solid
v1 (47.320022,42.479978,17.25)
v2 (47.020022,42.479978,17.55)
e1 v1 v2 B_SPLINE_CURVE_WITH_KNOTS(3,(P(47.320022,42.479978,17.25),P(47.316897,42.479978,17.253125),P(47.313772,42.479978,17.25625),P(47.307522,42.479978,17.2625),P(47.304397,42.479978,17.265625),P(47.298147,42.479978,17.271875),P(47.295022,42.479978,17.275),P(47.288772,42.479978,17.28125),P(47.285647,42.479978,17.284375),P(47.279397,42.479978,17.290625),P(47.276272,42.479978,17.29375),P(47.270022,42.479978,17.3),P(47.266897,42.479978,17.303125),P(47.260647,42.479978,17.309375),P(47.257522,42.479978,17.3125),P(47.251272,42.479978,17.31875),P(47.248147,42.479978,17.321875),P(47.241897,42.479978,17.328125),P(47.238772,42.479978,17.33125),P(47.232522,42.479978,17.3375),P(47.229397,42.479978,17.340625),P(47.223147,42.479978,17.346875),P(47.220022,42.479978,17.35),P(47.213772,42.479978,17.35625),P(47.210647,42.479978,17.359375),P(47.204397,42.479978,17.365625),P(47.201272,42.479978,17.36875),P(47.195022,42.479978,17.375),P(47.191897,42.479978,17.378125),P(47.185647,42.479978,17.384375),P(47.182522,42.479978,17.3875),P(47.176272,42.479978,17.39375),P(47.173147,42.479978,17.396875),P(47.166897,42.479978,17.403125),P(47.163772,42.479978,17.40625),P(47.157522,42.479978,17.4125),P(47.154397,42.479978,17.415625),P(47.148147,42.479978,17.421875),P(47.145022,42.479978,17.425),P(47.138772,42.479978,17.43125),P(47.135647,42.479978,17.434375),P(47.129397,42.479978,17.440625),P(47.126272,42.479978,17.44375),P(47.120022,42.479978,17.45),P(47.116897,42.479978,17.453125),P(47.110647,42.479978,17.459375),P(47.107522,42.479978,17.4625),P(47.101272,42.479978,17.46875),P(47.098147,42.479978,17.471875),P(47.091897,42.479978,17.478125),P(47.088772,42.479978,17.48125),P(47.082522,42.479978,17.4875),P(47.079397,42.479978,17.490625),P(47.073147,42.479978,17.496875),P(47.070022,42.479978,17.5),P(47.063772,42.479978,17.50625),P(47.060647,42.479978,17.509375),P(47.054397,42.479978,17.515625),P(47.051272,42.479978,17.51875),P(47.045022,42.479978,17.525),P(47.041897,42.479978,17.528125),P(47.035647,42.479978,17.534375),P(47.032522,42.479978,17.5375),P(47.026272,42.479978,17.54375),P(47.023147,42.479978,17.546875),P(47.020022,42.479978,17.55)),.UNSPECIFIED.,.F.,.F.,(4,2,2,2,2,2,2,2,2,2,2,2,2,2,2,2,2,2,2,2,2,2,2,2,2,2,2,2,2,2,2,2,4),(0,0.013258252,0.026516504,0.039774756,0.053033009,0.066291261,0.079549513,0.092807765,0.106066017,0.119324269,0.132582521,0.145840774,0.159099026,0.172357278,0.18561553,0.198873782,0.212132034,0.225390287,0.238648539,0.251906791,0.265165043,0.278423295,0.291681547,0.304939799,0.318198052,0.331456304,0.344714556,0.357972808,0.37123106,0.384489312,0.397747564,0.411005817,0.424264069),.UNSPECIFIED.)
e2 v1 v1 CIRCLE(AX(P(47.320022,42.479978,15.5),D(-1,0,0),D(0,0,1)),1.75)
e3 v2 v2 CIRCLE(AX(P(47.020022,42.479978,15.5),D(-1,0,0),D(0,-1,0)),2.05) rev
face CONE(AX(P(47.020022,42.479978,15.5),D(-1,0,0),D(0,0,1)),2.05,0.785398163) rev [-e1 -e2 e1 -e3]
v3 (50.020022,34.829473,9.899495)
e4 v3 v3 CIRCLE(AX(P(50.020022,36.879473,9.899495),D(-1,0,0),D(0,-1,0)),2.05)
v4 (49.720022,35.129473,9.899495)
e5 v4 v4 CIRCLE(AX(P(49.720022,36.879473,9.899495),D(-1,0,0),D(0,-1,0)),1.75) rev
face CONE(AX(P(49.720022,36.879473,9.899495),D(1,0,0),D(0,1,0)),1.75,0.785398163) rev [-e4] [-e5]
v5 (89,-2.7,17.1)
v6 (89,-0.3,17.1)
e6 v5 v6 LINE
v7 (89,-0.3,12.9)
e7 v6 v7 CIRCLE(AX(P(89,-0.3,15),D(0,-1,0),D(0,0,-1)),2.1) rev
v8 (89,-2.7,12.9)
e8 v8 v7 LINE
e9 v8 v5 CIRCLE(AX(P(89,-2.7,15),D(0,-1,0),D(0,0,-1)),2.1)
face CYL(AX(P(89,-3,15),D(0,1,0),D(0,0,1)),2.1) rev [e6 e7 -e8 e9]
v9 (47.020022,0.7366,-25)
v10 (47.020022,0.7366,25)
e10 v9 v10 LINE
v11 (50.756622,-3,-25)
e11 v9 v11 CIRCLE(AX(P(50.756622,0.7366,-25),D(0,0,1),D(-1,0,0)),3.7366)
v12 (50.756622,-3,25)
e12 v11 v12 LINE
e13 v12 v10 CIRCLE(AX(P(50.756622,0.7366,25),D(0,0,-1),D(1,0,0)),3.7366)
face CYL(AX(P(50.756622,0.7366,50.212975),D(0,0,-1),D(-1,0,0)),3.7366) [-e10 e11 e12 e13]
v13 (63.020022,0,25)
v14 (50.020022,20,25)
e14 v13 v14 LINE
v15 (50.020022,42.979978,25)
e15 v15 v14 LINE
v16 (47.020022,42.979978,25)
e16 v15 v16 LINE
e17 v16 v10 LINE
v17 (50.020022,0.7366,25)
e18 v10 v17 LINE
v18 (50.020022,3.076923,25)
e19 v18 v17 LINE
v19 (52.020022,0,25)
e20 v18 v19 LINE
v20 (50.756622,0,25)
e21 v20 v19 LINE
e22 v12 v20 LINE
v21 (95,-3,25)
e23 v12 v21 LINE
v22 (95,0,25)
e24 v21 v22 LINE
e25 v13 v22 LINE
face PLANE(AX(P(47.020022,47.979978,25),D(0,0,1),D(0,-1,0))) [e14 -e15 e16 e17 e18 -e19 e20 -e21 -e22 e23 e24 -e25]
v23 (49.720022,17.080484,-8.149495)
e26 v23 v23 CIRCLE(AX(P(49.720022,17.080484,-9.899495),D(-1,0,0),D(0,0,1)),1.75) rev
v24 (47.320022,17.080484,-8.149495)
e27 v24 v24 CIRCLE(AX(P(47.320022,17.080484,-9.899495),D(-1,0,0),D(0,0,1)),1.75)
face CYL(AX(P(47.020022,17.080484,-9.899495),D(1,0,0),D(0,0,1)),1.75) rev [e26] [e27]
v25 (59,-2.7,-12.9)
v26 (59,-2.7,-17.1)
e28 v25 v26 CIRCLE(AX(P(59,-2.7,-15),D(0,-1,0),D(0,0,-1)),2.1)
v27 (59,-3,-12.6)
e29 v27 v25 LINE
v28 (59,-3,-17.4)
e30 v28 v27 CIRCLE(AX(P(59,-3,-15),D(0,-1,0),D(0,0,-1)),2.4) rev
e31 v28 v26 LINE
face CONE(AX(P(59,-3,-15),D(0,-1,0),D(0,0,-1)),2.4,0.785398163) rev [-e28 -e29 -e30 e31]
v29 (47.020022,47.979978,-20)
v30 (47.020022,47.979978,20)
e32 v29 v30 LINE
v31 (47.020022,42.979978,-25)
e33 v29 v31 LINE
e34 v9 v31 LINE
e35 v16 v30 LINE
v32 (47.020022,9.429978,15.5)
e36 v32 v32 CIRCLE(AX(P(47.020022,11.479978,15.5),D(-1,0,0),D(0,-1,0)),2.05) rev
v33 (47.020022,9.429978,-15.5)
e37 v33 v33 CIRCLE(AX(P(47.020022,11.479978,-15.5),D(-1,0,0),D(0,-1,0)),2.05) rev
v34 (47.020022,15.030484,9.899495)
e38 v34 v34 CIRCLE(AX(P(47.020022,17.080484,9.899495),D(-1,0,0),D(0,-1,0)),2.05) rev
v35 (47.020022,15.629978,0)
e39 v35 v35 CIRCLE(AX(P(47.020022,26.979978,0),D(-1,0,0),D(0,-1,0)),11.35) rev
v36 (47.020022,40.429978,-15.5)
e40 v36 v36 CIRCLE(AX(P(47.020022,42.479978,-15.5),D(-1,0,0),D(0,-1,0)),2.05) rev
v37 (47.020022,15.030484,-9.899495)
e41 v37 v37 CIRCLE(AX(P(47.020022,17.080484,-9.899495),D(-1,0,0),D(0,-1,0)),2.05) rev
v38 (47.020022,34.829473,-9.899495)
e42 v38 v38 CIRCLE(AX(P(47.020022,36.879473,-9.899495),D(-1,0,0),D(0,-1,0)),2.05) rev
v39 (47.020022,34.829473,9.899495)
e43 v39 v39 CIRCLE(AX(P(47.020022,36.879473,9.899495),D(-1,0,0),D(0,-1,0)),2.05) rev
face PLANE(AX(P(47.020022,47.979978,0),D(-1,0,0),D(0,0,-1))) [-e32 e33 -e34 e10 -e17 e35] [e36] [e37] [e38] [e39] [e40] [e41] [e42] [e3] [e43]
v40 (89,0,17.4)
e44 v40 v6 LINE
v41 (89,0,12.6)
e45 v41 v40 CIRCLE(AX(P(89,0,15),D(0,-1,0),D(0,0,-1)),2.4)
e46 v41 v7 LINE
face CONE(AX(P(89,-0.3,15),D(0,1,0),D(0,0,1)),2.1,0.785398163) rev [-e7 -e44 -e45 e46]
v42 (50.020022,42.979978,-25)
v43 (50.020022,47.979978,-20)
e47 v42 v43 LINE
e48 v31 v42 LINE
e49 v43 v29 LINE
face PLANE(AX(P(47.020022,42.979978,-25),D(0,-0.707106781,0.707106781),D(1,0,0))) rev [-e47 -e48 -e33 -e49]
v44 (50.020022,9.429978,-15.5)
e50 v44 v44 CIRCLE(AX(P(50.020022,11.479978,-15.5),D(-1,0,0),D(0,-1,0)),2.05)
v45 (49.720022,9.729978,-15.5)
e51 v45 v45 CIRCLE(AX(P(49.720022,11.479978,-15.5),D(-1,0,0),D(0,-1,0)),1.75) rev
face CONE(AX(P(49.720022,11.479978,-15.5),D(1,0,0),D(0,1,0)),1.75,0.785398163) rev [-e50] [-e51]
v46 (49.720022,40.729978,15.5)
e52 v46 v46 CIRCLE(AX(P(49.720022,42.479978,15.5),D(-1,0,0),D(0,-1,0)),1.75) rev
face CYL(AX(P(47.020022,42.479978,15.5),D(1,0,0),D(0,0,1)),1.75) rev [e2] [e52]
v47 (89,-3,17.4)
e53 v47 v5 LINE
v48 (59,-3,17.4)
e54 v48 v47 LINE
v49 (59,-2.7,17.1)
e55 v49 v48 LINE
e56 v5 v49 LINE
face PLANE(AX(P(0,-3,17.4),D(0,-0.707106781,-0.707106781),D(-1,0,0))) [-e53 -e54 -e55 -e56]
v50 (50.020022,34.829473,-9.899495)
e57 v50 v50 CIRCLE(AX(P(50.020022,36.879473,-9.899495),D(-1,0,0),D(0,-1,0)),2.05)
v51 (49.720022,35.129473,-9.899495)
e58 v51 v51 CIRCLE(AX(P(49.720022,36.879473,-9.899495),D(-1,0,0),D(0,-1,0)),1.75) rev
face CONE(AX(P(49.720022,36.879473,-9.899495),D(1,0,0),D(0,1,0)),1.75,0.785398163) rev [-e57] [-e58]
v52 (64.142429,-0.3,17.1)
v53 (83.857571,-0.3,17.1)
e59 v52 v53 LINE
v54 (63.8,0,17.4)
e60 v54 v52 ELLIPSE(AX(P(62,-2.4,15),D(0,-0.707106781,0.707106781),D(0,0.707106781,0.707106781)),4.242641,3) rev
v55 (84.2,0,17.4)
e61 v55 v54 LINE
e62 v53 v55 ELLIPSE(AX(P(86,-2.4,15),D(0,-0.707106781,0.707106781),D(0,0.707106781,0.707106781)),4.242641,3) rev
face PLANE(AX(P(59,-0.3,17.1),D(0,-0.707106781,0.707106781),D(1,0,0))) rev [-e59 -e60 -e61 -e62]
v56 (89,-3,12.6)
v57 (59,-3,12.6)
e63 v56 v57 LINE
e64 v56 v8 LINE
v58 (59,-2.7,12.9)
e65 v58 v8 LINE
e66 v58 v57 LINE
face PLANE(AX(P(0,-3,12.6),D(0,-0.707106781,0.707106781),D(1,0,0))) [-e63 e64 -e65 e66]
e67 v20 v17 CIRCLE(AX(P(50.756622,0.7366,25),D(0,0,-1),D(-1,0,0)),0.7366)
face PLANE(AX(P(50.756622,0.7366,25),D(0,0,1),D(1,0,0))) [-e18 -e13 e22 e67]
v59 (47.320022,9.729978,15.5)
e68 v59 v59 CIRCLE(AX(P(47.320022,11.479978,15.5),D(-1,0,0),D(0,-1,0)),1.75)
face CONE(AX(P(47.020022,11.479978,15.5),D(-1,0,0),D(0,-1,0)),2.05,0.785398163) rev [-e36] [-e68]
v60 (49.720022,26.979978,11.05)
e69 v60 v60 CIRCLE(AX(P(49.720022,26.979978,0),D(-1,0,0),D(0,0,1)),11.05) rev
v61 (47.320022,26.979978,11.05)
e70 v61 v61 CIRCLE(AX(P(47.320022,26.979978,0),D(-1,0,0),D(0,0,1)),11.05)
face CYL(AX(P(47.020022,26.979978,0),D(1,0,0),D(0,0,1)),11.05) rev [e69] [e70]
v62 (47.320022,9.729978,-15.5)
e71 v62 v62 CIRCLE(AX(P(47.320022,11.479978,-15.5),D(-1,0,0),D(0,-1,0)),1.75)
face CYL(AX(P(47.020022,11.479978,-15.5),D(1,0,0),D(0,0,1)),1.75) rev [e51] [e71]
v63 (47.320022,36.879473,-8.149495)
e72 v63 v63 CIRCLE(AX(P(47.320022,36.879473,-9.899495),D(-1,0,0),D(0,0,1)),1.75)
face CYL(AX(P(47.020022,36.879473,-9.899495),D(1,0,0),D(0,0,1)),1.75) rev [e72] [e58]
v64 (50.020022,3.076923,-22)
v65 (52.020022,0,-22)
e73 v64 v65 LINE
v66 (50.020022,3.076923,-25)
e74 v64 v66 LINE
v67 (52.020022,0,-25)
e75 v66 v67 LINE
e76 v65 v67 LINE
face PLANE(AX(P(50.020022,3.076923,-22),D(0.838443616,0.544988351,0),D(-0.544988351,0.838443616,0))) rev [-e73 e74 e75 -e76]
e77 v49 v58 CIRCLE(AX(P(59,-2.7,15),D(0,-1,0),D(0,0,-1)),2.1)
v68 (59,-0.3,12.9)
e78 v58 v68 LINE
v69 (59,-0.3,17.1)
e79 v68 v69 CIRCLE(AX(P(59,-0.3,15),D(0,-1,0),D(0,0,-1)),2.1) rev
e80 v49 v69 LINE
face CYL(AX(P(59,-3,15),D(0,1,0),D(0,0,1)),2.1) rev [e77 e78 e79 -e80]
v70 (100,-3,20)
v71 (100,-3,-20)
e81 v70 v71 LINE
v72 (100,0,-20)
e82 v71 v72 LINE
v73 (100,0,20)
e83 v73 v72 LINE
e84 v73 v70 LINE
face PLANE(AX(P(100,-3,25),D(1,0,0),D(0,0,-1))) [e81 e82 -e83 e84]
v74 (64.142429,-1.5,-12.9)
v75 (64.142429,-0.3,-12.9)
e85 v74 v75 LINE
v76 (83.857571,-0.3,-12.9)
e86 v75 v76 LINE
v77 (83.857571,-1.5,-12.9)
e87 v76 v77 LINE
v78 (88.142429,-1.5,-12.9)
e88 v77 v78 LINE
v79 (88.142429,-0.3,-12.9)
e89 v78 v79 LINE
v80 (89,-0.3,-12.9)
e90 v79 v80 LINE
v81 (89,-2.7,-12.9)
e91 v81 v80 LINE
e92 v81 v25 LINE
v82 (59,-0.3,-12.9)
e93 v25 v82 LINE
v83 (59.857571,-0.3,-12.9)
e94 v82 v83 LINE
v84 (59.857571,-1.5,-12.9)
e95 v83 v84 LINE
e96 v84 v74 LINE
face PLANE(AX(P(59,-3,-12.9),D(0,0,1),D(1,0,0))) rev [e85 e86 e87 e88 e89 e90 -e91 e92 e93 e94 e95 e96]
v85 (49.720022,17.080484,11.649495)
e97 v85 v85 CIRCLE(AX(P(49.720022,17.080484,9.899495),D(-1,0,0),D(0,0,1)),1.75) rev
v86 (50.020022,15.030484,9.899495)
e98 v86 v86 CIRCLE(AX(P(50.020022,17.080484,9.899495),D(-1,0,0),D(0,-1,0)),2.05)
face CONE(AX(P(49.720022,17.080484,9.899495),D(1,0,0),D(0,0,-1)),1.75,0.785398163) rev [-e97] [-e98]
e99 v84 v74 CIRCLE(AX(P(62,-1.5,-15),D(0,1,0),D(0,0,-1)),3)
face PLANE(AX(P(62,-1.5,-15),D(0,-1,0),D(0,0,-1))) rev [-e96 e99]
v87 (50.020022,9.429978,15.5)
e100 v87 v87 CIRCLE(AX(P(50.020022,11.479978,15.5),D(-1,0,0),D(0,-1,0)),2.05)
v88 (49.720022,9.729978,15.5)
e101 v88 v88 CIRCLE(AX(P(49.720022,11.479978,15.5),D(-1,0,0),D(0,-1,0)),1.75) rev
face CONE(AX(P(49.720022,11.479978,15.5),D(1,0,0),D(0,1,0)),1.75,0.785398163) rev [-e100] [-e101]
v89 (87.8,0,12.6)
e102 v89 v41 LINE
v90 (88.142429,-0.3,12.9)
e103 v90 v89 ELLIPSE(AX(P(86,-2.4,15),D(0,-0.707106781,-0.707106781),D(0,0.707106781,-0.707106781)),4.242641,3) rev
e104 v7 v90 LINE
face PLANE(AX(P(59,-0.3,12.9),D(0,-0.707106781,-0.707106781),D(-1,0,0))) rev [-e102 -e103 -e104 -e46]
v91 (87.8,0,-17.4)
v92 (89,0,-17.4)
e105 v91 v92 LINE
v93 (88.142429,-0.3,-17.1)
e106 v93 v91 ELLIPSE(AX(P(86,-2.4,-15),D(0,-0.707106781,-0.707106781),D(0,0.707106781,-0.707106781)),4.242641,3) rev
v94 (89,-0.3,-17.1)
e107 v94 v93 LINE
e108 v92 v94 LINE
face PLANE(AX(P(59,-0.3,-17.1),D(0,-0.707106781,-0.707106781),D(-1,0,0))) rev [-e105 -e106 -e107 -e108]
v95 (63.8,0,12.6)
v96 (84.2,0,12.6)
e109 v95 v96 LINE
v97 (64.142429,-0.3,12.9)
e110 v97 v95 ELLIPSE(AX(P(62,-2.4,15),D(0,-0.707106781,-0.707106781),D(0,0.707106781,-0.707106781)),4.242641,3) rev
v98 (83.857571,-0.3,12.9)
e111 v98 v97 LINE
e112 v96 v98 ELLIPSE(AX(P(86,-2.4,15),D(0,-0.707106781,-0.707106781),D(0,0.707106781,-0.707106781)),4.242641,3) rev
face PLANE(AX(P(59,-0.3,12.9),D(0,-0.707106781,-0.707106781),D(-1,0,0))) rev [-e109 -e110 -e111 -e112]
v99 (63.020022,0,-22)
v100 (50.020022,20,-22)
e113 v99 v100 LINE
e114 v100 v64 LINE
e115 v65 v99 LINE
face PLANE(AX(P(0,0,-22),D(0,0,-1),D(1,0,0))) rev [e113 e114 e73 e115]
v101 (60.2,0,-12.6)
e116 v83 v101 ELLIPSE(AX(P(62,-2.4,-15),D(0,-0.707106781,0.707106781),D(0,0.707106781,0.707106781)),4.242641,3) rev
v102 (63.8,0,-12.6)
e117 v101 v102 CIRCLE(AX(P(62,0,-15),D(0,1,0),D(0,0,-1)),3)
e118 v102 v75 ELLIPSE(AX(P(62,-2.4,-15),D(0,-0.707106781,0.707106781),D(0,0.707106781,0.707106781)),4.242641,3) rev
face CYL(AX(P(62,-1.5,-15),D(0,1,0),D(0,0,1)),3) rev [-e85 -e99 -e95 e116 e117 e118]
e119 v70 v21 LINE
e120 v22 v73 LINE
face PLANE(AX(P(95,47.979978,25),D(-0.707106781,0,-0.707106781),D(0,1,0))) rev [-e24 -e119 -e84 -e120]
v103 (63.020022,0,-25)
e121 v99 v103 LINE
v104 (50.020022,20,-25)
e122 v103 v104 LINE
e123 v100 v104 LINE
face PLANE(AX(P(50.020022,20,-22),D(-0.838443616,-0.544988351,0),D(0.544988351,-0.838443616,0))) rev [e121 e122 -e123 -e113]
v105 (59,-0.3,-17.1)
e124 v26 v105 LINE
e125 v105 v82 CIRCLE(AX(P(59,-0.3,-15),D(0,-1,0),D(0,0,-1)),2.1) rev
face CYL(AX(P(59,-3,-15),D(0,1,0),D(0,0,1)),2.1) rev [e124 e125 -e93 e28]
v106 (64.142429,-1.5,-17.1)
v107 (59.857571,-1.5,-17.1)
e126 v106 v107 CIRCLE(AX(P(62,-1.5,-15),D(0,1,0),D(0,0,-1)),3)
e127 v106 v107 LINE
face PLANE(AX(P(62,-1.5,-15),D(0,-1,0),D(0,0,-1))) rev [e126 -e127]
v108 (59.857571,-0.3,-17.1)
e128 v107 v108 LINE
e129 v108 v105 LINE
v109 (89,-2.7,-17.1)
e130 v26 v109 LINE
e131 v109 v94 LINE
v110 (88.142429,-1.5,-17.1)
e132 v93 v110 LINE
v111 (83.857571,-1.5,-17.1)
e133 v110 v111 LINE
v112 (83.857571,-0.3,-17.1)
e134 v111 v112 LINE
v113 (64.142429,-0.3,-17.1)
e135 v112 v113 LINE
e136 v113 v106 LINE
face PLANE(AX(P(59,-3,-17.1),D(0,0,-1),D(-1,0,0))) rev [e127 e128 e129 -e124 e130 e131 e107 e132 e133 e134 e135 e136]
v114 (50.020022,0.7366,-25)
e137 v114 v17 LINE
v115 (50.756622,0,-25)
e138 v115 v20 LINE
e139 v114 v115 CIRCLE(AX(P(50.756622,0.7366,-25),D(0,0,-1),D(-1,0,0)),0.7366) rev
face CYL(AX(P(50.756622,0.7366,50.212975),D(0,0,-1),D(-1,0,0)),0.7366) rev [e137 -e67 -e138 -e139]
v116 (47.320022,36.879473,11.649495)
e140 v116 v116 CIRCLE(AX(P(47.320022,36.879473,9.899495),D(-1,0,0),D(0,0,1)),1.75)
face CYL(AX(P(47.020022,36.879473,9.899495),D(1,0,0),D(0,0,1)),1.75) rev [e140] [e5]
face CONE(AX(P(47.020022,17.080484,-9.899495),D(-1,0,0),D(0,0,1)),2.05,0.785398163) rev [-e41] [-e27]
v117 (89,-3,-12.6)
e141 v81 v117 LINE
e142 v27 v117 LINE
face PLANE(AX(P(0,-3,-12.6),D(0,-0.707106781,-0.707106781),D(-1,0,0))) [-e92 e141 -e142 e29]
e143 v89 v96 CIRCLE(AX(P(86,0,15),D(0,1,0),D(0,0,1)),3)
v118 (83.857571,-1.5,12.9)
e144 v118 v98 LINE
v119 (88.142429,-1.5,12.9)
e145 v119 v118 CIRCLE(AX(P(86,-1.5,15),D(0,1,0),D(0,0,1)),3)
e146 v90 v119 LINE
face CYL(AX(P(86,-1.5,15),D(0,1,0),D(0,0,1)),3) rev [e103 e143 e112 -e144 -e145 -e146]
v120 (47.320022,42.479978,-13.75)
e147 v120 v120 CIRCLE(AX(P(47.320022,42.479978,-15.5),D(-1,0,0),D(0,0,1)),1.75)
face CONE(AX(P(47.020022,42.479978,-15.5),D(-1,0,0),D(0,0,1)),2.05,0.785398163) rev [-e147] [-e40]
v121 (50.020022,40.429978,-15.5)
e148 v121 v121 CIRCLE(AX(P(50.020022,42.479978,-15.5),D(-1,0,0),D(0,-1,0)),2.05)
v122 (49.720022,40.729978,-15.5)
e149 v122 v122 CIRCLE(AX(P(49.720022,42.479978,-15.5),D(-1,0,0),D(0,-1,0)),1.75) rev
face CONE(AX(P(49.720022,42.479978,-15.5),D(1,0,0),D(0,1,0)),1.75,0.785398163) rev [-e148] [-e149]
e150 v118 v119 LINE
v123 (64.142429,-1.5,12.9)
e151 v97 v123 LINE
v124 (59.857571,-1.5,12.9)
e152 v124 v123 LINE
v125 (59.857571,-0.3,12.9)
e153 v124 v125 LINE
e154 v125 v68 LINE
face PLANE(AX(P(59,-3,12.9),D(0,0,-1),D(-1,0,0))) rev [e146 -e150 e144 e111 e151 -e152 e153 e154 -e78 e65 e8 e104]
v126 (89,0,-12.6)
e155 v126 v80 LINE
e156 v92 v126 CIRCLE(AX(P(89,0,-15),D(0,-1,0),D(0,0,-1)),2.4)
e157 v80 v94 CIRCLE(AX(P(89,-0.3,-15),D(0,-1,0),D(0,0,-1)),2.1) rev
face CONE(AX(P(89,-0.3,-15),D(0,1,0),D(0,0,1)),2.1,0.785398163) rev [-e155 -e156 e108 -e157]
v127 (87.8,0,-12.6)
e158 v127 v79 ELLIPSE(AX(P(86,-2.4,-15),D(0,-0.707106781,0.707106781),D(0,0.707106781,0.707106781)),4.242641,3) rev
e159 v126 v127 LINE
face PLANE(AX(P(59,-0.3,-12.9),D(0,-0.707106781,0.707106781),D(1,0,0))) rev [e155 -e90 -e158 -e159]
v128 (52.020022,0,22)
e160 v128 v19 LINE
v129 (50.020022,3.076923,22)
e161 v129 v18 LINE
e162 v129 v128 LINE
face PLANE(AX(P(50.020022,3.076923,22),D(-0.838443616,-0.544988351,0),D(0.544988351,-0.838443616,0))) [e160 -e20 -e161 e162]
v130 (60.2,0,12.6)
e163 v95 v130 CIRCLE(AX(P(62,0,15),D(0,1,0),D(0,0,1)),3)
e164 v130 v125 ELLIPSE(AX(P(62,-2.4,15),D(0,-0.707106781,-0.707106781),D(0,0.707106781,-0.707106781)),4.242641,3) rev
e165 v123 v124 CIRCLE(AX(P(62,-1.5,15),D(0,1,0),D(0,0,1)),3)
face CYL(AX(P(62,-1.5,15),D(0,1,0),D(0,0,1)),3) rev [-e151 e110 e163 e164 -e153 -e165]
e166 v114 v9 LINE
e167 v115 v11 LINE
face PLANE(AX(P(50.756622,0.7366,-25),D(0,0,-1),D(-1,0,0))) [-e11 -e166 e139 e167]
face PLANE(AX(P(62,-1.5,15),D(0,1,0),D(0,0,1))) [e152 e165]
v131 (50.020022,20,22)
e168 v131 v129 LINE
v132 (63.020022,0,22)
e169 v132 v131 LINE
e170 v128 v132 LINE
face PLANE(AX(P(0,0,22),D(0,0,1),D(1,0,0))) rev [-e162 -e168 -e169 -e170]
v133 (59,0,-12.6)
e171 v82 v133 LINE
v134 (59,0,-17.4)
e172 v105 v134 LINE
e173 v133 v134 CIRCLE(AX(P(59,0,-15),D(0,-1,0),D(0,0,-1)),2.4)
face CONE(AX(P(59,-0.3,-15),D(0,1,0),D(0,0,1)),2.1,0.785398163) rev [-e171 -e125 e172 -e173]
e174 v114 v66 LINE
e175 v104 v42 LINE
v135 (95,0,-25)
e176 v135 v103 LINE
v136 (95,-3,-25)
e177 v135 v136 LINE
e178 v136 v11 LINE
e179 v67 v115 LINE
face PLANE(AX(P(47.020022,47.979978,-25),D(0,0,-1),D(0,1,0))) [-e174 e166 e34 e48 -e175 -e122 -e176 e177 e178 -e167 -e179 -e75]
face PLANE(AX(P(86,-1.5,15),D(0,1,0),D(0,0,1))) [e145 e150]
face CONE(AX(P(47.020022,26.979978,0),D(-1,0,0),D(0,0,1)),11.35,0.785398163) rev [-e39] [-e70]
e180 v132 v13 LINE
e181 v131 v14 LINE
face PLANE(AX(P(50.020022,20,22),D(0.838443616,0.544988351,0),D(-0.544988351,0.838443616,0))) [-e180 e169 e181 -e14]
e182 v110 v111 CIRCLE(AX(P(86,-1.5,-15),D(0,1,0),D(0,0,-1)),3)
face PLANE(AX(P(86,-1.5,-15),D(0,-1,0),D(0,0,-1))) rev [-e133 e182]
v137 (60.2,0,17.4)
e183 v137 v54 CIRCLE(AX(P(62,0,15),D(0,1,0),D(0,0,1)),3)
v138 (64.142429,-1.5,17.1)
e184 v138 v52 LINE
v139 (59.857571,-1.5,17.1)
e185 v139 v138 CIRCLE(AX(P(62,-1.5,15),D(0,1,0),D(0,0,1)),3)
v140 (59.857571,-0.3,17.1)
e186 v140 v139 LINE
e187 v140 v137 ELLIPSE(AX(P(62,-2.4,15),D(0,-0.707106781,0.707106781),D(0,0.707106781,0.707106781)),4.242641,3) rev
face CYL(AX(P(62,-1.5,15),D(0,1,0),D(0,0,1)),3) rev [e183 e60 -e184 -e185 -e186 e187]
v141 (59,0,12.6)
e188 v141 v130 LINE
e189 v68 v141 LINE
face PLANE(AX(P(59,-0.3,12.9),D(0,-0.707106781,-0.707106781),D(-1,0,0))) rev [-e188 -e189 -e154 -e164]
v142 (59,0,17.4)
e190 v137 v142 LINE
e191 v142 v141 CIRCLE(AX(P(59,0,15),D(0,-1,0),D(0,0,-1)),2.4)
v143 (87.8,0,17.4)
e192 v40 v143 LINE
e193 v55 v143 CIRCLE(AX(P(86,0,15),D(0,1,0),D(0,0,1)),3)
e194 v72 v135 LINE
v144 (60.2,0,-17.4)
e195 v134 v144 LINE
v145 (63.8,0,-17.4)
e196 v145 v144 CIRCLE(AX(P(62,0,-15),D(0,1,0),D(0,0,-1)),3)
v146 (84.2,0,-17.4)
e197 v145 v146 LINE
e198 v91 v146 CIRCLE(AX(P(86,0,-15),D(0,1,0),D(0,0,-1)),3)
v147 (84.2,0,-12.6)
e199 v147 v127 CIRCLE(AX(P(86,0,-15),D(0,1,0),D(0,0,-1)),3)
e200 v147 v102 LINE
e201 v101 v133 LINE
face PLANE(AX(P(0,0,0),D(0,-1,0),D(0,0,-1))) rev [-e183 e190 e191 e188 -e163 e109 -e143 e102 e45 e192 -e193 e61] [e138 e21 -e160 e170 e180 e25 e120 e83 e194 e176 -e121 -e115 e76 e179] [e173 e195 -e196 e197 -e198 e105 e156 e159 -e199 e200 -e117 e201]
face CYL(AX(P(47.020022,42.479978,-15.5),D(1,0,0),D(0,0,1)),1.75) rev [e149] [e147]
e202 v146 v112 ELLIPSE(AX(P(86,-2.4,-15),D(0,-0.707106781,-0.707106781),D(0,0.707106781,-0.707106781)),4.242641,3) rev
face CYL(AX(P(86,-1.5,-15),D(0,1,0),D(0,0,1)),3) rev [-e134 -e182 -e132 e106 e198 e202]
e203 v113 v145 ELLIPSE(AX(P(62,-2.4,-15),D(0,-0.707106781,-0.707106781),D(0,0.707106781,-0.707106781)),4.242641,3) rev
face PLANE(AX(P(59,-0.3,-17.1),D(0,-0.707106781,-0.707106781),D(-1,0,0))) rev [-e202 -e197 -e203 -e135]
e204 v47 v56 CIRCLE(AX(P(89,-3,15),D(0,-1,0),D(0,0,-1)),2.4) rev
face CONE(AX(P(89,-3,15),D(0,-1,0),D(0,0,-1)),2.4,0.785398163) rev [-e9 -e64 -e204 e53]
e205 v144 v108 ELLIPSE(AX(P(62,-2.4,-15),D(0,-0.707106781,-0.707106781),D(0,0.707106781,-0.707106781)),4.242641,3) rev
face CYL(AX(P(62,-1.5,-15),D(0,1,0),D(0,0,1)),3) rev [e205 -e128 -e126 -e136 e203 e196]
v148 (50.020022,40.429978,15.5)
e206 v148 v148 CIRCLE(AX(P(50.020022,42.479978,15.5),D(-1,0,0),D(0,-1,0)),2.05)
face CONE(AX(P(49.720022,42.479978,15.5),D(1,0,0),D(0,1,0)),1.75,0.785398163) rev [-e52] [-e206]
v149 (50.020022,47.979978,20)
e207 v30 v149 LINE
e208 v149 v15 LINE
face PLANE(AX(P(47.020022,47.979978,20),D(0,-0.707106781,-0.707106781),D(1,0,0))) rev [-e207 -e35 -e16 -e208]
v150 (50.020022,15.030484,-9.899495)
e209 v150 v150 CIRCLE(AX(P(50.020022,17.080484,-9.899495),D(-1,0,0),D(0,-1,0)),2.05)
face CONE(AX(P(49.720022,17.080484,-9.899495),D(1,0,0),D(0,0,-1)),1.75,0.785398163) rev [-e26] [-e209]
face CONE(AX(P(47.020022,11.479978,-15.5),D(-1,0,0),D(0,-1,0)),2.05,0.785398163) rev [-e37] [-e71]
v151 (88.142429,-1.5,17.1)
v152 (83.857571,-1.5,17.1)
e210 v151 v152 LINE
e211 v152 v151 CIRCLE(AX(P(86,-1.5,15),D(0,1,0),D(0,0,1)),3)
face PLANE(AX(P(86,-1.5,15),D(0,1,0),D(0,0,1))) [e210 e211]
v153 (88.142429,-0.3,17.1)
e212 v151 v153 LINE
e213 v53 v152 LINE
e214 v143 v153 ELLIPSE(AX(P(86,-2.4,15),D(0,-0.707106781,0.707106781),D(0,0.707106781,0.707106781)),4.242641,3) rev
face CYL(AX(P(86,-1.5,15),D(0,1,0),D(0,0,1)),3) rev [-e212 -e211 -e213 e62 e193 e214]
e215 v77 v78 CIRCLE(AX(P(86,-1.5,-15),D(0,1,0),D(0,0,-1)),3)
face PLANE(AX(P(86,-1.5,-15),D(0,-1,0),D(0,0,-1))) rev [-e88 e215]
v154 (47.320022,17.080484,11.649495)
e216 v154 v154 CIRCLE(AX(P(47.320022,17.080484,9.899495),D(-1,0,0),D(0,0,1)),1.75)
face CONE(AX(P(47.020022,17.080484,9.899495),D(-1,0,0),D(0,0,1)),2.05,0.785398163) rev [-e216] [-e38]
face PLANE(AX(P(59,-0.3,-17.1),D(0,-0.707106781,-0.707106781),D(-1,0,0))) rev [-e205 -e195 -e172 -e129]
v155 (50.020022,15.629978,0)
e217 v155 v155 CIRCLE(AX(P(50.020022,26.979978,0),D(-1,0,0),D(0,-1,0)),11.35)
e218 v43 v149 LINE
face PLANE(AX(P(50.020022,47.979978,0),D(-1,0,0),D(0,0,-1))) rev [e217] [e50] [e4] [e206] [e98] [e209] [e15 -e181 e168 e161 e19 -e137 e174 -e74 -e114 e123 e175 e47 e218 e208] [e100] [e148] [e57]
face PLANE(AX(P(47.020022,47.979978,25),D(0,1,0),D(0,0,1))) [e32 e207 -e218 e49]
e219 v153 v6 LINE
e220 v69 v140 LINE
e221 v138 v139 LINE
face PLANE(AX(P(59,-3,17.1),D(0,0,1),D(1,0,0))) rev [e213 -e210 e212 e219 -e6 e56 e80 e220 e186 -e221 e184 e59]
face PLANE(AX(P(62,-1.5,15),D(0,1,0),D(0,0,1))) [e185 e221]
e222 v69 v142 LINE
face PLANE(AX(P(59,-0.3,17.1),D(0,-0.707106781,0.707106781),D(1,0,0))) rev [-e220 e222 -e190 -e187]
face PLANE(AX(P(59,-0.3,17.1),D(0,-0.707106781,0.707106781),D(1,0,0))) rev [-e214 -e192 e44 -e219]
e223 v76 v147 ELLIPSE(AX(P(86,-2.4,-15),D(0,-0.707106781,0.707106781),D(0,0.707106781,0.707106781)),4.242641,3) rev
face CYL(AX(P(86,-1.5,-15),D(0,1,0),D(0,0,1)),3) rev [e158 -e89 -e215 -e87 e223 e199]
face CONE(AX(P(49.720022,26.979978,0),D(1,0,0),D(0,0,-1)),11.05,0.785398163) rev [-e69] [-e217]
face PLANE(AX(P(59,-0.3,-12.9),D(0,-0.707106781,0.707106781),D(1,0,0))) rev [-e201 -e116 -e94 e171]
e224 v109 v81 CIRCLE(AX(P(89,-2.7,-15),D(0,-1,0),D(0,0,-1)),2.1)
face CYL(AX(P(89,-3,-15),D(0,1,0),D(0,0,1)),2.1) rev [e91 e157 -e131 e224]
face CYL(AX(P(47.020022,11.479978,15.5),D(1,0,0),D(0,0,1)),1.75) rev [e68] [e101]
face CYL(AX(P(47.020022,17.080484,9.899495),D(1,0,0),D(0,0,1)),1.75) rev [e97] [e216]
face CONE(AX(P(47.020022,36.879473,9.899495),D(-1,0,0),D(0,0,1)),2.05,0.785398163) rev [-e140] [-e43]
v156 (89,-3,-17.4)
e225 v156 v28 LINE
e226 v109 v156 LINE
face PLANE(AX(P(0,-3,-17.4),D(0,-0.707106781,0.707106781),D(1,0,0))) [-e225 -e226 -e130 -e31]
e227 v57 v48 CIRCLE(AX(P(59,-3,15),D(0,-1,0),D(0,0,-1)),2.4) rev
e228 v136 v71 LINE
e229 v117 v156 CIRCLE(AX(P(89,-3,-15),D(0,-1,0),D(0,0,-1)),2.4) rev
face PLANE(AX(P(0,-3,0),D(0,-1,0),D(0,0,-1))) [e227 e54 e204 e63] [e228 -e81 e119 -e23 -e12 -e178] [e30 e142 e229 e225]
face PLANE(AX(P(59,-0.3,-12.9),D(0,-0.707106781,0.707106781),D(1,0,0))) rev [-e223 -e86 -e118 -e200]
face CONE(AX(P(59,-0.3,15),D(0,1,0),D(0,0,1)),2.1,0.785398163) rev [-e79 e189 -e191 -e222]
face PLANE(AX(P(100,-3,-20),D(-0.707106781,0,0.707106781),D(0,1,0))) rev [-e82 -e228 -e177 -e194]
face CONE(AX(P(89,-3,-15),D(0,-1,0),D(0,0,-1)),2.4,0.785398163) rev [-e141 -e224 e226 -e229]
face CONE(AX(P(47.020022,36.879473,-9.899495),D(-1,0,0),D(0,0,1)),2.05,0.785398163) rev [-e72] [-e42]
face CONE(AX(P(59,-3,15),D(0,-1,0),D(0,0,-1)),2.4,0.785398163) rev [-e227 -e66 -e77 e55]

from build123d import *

# Parameters (mm, degrees)
SKETCH1_W                    = 100
SKETCH1_H                    = 50
BASE_FLANGE1_DEPTH           = 3
SKETCH2_R                    = 11.05
SKETCH2_R_2                  = 1.75
CUT_EXTRUDE1_DEPTH           = 104.121287812
SKETCH3_R                    = 1.75
CUT_EXTRUDE2_DEPTH           = 104.121287812
CIRPATTERN1_COUNT            = 4
CUT_EXTRUDE3_DEPTH           = 104.121287812
SKETCHED_BEND2_OUTLINE_W     = 3
SKETCHED_BEND2_OUTLINE_H     = 50
SKETCHED_BEND2_DEPTH         = 47.020021532
SKETCHED_START               = 47.383443248
SKETCHED_BEND2_2_OUTLINE_W   = 47.979978468
SKETCHED_BEND2_2_OUTLINE_H   = 50
SKETCHED_BEND2_2_OUTLINE_R   = 1.75
SKETCHED_BEND2_2_OUTLINE_R_2 = 11.05
SKETCHED_BEND2_2_DEPTH       = 2.636578284
SKETCHED_START_2             = 47.020021532
SKETCHED_BEND2_3_OUTLINE_W   = 47.979978468
SKETCHED_BEND2_3_OUTLINE_H   = 50
SKETCHED_BEND2_3_OUTLINE_R   = 1.75
SKETCHED_BEND2_3_OUTLINE_R_2 = 11.05
SKETCHED_BEND2_3_DEPTH       = 3.7366
SKETCHED_START_3             = -26
SKETCHED_BEND2_4_DEPTH       = 52
BOSS_EXTRUDE1_DEPTH          = 3
CHAMFER1_SIZE                = 5
CHAMFER2_SIZE                = 0.3
CHAMFER3_SIZE                = 0.3
SKETCH7_R                    = 3
CUT_EXTRUDE4_DEPTH           = 1.5


with BuildPart() as part:
    # Base-Flange1: sheet metal written as solids
    # Sketch1 → Base-Flange1 (new body)
    with BuildSketch(Plane(origin=(0, 0, 0), x_dir=(1, 0, 0), z_dir=(0, 1, 0))):
        with Locations((50, 0)):
            Rectangle(SKETCH1_W, SKETCH1_H)
    extrude(amount=-BASE_FLANGE1_DEPTH)

    # Sketch2 → Cut-Extrude1 (cut, through all)
    with BuildSketch(Plane(origin=(0, 0, 0), x_dir=(1, 0, 0), z_dir=(0, 1, 0))):
        with Locations(Location((21, 0, 0), (0, 0, 270))):
            Circle(SKETCH2_R)
        with Locations(Location((5.5, 15.5, 0), (0, 0, 270))):
            Circle(SKETCH2_R_2)
        with Locations(Location((36.5, 15.5, 0), (0, 0, 270))):
            Circle(SKETCH2_R_2)
        with Locations(Location((36.5, -15.5, 0), (0, 0, 270))):
            Circle(SKETCH2_R_2)
        with Locations(Location((5.5, -15.5, 0), (0, 0, 270))):
            Circle(SKETCH2_R_2)
    extrude(amount=-CUT_EXTRUDE1_DEPTH, mode=Mode.SUBTRACT)

    # Sketch3 → Cut-Extrude2 (cut, through all)
    with BuildSketch(Plane(origin=(0, 0, 0), x_dir=(1, 0, 0), z_dir=(0, 1, 0))):
        with Locations(Location((11.100505063, 9.899494937, 0), (0, 0, 270))):
            Circle(SKETCH3_R)
    cut_extrude2 = extrude(amount=-CUT_EXTRUDE2_DEPTH, mode=Mode.SUBTRACT)

    # CirPattern1: Cut-Extrude2 ×4 about axis
    cirpattern1_axis = Axis((21, 0, 0), (0, 1, 0))
    for i in range(1, CIRPATTERN1_COUNT):
        add(cut_extrude2.rotate(cirpattern1_axis, i * 360 / CIRPATTERN1_COUNT), mode=Mode.SUBTRACT)

    # Sketch4 → Cut-Extrude3 (cut, through all)
    with BuildSketch(Plane(origin=(0, 0, 0), x_dir=(1, 0, 0), z_dir=(0, 1, 0))):
        with BuildLine():
            Line((59, 17.1), (89, 17.1))
            ThreePointArc((89, 17.1), (91.1, 15), (89, 12.9))
            Line((89, 12.9), (59, 12.9))
            ThreePointArc((59, 12.9), (56.9, 15), (59, 17.1))
        make_face()
        with BuildLine():
            Line((59, -12.9), (89, -12.9))
            ThreePointArc((89, -12.9), (91.1, -15), (89, -17.1))
            Line((89, -17.1), (59, -17.1))
            ThreePointArc((59, -17.1), (56.9, -15), (59, -12.9))
        make_face()
    extrude(amount=-CUT_EXTRUDE3_DEPTH, mode=Mode.SUBTRACT)

    # Sketched Bend2: read off the stored shape, not the designer's step
    # Sketched Bend2 outline → Sketched Bend2 (cut)
    with BuildSketch(Plane.YZ):
        with Locations((-1.5, 0)):
            Rectangle(SKETCHED_BEND2_OUTLINE_W, SKETCHED_BEND2_OUTLINE_H)
    extrude(amount=SKETCHED_BEND2_DEPTH, mode=Mode.SUBTRACT)

    # Sketched Bend2 2 outline → Sketched Bend2 2 (add)
    with BuildSketch(Plane.YZ.offset(SKETCHED_START)):
        with Locations((23.989989234, 0)):
            Rectangle(SKETCHED_BEND2_2_OUTLINE_W, SKETCHED_BEND2_2_OUTLINE_H)
        with Locations((11.479978468, -15.5)):
            Circle(SKETCHED_BEND2_2_OUTLINE_R, mode=Mode.SUBTRACT)
        with Locations((17.080483531, -9.899494937)):
            Circle(SKETCHED_BEND2_2_OUTLINE_R, mode=Mode.SUBTRACT)
        with Locations((42.479978468, -15.5)):
            Circle(SKETCHED_BEND2_2_OUTLINE_R, mode=Mode.SUBTRACT)
        with Locations((36.879473404, -9.899494937)):
            Circle(SKETCHED_BEND2_2_OUTLINE_R, mode=Mode.SUBTRACT)
        with Locations((17.080483531, 9.899494937)):
            Circle(SKETCHED_BEND2_2_OUTLINE_R, mode=Mode.SUBTRACT)
        with Locations((11.479978468, 15.5)):
            Circle(SKETCHED_BEND2_2_OUTLINE_R, mode=Mode.SUBTRACT)
        with Locations((26.979978468, 0)):
            Circle(SKETCHED_BEND2_2_OUTLINE_R_2, mode=Mode.SUBTRACT)
        with Locations((36.879473404, 9.899494937)):
            Circle(SKETCHED_BEND2_2_OUTLINE_R, mode=Mode.SUBTRACT)
        with Locations((42.479978468, 15.5)):
            Circle(SKETCHED_BEND2_2_OUTLINE_R, mode=Mode.SUBTRACT)
    extrude(amount=SKETCHED_BEND2_2_DEPTH)

    # Sketched Bend2 3 outline → Sketched Bend2 3 (add)
    with BuildSketch(Plane.YZ.offset(SKETCHED_START_2)):
        with Locations((23.989989234, 0)):
            Rectangle(SKETCHED_BEND2_3_OUTLINE_W, SKETCHED_BEND2_3_OUTLINE_H)
        with Locations((11.479978468, -15.5)):
            Circle(SKETCHED_BEND2_3_OUTLINE_R, mode=Mode.SUBTRACT)
        with Locations((17.080483531, -9.899494937)):
            Circle(SKETCHED_BEND2_3_OUTLINE_R, mode=Mode.SUBTRACT)
        with Locations((42.479978468, -15.5)):
            Circle(SKETCHED_BEND2_3_OUTLINE_R, mode=Mode.SUBTRACT)
        with Locations((36.879473404, -9.899494937)):
            Circle(SKETCHED_BEND2_3_OUTLINE_R, mode=Mode.SUBTRACT)
        with Locations((17.080483531, 9.899494937)):
            Circle(SKETCHED_BEND2_3_OUTLINE_R, mode=Mode.SUBTRACT)
        with Locations((11.479978468, 15.5)):
            Circle(SKETCHED_BEND2_3_OUTLINE_R, mode=Mode.SUBTRACT)
        with Locations((26.979978468, 0)):
            Circle(SKETCHED_BEND2_3_OUTLINE_R_2, mode=Mode.SUBTRACT)
        with Locations((36.879473404, 9.899494937)):
            Circle(SKETCHED_BEND2_3_OUTLINE_R, mode=Mode.SUBTRACT)
        with Locations((42.479978468, 15.5)):
            Circle(SKETCHED_BEND2_3_OUTLINE_R, mode=Mode.SUBTRACT)
    extrude(amount=SKETCHED_BEND2_3_DEPTH)

    # Sketched Bend2 4 outline → Sketched Bend2 4 (cut)
    with BuildSketch(Plane.XY.offset(SKETCHED_START_3)):
        with BuildLine():
            Line((50.756621532, 47.979978468), (50.020021532, 47.979978468))
            Line((50.020021532, 47.979978468), (50.020021532, 0.7366))
            ThreePointArc((50.020021532, 0.7366), (50.235766677, 0.215745145), (50.756621532, 0))
            Line((50.756621532, 0), (50.756621532, 47.979978468))
        make_face()
        with BuildLine():
            ThreePointArc((50.756621532, -3), (48.114446333, -1.905575198), (47.020021532, 0.7366))
            Line((47.020021532, 0.7366), (47.020021532, -3))
            Line((47.020021532, -3), (50.756621532, -3))
        make_face()
    extrude(amount=SKETCHED_BEND2_4_DEPTH, mode=Mode.SUBTRACT)

    # Sketch6 → Boss-Extrude1 (add)
    with BuildSketch(Plane.XY.offset(25)):
        Polygon((50.020021532, 20), (63.020021532, 0), (52.020021532, 0), (50.020021532, 3.076923077), align=None)
    boss_extrude1 = extrude(amount=-BOSS_EXTRUDE1_DEPTH)

    # Mirror1: Boss-Extrude1 across plane
    add(boss_extrude1.mirror(Plane.XY))

    # Chamfer1
    chamfer1_edges = [part.edges().sort_by_distance(p)[0] for p in [
        (100, -1.5, -25),
        (100, -1.5, 25),
        (48.520021532, 47.979978468, -25),
        (48.520021532, 47.979978468, 25),
    ]]
    chamfer(chamfer1_edges, length=CHAMFER1_SIZE)

    # Chamfer2
    chamfer2_edges = [part.edges().sort_by_distance(p)[0] for p in [
        (74, 0, -17.1),
        (91.1, 0, -15),
        (74, 0, -12.9),
        (56.9, 0, -15),
        (74, 0, 12.9),
        (91.1, 0, 15),
        (74, 0, 17.1),
        (56.9, 0, 15),
        (56.9, -3, 15),
        (74, -3, 17.1),
        (91.1, -3, 15),
        (74, -3, 12.9),
        (56.9, -3, -15),
        (74, -3, -12.9),
        (91.1, -3, -15),
        (74, -3, -17.1),
        (47.020021532, 15.929978468, 0),
        (50.020021532, 15.929978468, 0),
        (47.020021532, 40.729978468, -15.5),
        (50.020021532, 40.729978468, -15.5),
        (47.020021532, 9.729978468, -15.5),
        (50.020021532, 9.729978468, -15.5),
        (47.020021532, 9.729978468, 15.5),
        (50.020021532, 9.729978468, 15.5),
        (47.020021532, 40.729978468, 15.5),
        (50.020021532, 40.729978468, 15.5),
    ]]
    chamfer(chamfer2_edges, length=CHAMFER2_SIZE)

    # Chamfer3
    chamfer3_edges = [part.edges().sort_by_distance(p)[0] for p in [
        (47.020021532, 35.129473404, -9.899494937),
        (50.020021532, 35.129473404, -9.899494937),
        (47.020021532, 35.129473404, 9.899494937),
        (50.020021532, 35.129473404, 9.899494937),
        (47.020021532, 15.330483531, 9.899494937),
        (50.020021532, 15.330483531, 9.899494937),
        (47.020021532, 15.330483531, -9.899494937),
        (50.020021532, 15.330483531, -9.899494937),
    ]]
    chamfer(chamfer3_edges, length=CHAMFER3_SIZE)

    # Sketch7 → Cut-Extrude4 (cut)
    with BuildSketch(Plane(origin=(0, 0, 0), x_dir=(1, 0, 0), z_dir=(0, 1, 0))):
        with Locations((86, -15)):
            Circle(SKETCH7_R)
        with Locations((62, -15)):
            Circle(SKETCH7_R)
        with Locations((86, 15)):
            Circle(SKETCH7_R)
        with Locations((62, 15)):
            Circle(SKETCH7_R)
    extrude(amount=-CUT_EXTRUDE4_DEPTH, mode=Mode.SUBTRACT)


solid = part.part
